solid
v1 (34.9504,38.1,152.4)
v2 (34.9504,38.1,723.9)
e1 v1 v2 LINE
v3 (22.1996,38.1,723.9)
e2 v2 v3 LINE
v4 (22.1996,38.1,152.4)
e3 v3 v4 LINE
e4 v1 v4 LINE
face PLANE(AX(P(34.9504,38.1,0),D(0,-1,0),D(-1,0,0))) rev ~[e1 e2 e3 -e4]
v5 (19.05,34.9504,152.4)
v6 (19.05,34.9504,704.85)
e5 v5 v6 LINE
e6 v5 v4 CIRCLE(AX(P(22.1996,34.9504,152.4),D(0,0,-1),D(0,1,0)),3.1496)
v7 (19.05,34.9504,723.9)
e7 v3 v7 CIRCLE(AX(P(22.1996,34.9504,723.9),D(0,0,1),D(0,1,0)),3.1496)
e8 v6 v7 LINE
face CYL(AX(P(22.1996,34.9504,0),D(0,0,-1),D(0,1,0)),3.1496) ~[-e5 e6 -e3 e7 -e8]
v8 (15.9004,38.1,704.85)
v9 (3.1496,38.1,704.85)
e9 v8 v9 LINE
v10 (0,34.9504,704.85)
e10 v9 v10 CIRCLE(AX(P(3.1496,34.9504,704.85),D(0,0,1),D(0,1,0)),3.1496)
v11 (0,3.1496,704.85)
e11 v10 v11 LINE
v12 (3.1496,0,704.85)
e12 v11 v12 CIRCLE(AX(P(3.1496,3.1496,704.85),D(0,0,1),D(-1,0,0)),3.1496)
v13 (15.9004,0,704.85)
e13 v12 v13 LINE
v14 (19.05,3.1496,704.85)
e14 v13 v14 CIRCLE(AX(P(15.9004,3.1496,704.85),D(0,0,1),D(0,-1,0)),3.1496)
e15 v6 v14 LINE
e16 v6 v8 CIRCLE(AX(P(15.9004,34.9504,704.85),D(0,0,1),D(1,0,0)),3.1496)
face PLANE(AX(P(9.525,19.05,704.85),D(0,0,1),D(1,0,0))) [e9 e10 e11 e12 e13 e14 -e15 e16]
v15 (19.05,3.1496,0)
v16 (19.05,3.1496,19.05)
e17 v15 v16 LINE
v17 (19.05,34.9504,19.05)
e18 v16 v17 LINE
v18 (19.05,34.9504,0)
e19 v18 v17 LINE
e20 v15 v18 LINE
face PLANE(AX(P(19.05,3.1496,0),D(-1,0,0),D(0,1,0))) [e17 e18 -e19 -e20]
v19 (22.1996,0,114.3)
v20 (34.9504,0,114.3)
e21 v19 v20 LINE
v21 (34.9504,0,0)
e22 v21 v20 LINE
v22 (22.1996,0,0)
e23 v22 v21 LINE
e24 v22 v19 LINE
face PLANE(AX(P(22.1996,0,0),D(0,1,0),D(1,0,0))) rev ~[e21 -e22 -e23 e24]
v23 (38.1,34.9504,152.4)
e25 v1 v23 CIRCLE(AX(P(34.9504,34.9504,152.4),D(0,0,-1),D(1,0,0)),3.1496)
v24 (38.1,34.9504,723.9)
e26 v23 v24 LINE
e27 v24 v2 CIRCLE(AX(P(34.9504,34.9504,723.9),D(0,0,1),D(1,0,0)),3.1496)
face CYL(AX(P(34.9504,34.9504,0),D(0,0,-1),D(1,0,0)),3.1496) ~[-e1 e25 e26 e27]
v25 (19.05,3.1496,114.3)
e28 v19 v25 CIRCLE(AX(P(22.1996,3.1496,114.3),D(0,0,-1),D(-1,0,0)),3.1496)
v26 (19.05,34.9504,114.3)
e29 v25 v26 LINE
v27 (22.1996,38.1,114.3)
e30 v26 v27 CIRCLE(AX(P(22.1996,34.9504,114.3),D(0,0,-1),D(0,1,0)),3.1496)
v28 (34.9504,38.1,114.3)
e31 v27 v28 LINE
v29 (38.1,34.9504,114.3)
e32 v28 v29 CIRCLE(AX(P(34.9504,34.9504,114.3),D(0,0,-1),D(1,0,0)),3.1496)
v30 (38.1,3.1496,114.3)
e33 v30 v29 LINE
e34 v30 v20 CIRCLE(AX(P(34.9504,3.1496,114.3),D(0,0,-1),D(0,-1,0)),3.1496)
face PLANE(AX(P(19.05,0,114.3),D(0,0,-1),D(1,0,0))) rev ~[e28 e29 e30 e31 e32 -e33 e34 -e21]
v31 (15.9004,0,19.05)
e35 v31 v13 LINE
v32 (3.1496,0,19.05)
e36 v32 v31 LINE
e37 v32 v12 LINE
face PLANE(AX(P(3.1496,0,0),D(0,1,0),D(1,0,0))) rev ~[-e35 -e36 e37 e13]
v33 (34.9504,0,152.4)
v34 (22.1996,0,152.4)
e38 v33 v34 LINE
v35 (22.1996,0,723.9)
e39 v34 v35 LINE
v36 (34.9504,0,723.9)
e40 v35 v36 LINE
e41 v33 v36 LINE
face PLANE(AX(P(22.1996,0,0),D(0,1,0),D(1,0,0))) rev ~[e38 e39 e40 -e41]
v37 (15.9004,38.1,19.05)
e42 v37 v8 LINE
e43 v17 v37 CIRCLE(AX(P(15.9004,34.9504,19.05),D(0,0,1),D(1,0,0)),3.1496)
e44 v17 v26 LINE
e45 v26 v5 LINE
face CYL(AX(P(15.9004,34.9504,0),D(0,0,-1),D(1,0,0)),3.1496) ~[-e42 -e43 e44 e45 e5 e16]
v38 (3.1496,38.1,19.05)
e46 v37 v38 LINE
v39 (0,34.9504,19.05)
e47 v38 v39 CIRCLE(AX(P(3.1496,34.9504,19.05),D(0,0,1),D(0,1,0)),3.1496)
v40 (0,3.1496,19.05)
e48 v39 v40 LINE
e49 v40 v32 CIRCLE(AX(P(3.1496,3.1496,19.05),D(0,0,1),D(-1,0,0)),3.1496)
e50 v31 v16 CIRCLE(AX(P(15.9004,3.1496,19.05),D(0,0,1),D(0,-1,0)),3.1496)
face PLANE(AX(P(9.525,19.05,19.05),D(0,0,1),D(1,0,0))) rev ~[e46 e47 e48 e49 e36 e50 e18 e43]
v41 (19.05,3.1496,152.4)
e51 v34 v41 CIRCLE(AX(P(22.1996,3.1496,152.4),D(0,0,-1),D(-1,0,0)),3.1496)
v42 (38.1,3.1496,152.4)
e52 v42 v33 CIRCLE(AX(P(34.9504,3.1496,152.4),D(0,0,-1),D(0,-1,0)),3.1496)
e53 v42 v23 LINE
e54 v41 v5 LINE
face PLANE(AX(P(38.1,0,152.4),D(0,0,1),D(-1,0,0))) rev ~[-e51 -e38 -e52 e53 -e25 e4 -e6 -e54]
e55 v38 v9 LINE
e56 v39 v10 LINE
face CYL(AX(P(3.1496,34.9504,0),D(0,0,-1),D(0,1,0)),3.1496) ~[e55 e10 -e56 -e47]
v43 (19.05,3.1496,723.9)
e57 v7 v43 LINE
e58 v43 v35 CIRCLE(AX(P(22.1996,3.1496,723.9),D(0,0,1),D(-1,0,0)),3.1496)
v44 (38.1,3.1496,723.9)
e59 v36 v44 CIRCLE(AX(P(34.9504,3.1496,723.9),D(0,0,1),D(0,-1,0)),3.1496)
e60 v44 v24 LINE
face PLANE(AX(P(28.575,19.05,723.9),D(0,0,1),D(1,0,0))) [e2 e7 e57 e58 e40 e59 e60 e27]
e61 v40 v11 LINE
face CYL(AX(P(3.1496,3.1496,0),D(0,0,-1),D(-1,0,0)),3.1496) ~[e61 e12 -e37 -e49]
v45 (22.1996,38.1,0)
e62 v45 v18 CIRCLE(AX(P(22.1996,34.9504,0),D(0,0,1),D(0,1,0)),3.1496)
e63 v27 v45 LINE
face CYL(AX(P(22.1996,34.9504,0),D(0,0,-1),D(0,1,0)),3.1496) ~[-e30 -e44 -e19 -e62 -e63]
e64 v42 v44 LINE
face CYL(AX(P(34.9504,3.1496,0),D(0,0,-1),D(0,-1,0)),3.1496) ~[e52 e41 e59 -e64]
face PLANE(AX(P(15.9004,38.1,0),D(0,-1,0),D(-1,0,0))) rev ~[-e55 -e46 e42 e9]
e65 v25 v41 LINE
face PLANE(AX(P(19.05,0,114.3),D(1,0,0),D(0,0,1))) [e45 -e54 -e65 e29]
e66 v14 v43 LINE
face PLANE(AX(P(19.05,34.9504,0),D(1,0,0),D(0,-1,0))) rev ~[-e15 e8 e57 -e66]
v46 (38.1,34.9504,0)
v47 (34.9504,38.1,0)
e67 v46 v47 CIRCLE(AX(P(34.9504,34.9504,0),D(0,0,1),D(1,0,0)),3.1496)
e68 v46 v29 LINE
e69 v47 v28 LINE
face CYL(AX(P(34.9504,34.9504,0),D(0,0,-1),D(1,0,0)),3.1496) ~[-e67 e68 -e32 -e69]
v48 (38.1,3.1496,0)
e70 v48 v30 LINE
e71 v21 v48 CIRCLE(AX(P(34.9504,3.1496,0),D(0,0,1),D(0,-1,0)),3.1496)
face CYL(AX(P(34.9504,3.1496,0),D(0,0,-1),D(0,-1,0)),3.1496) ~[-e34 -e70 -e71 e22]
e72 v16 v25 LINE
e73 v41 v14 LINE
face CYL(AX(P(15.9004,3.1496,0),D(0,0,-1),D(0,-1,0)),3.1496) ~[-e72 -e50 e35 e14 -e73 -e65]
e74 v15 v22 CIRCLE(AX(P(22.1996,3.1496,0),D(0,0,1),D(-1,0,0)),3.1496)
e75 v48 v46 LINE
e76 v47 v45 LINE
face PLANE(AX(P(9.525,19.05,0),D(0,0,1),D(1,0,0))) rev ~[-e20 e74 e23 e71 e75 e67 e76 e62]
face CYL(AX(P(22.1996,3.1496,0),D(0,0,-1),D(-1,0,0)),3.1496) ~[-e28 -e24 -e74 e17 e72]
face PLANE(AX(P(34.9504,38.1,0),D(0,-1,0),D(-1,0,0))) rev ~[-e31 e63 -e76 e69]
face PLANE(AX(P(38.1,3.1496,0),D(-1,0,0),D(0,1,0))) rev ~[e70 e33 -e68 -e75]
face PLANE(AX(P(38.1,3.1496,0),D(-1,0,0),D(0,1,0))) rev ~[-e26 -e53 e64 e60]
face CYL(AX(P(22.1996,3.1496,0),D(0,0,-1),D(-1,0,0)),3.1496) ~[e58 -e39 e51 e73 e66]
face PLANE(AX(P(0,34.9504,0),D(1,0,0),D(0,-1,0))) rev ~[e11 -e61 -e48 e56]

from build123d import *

# Parameters (mm, degrees)
F1_DEPTH = 723.9
F2_DEPTH = 704.85
F3_DEPTH = 19.05
F4_W     = 3.1496
F4_H     = 38.1
F4_W_2   = 12.7508
F5_DEPTH = 38.101


# Not quite as in the source:
# - a feature names something its author has since deleted; it is built from what else it names


with BuildPart() as f1:
    # F0 (on Top) → F1 (new body)
    with BuildSketch(Plane.XY):
        with BuildLine():
            Line((19.05, 34.9504), (19.05, 3.1496))
            ThreePointArc((19.05, 3.1496), (19.972496482, 0.922496482), (22.1996, 0))
            Line((22.1996, 0), (34.9504, 0))
            ThreePointArc((34.9504, 0), (37.177503518, 0.922496482), (38.1, 3.1496))
            Line((38.1, 3.1496), (38.1, 34.9504))
            ThreePointArc((38.1, 34.9504), (37.177503518, 37.177503518), (34.9504, 38.1))
            Line((34.9504, 38.1), (22.1996, 38.1))
            ThreePointArc((22.1996, 38.1), (19.972496482, 37.177503518), (19.05, 34.9504))
        make_face()
    extrude(amount=F1_DEPTH)

    # F0 (on Top) → F2 (join)
    with BuildSketch(Plane.XY):
        with BuildLine():
            ThreePointArc((0, 3.1496), (0.922496482, 0.922496482), (3.1496, 0))
            Line((3.1496, 0), (15.9004, 0))
            ThreePointArc((15.9004, 0), (18.127503518, 0.922496482), (19.05, 3.1496))
            Line((19.05, 3.1496), (19.05, 34.9504))
            ThreePointArc((19.05, 34.9504), (18.127503518, 37.177503518), (15.9004, 38.1))
            Line((15.9004, 38.1), (3.1496, 38.1))
            ThreePointArc((3.1496, 38.1), (0.922496482, 37.177503518), (0, 34.9504))
            Line((0, 34.9504), (0, 3.1496))
        make_face()
        with BuildLine():
            Line((19.05, 34.9504), (19.05, 3.1496))
            ThreePointArc((19.05, 3.1496), (19.972496482, 0.922496482), (22.1996, 0))
            Line((22.1996, 0), (34.9504, 0))
            ThreePointArc((34.9504, 0), (37.177503518, 0.922496482), (38.1, 3.1496))
            Line((38.1, 3.1496), (38.1, 34.9504))
            ThreePointArc((38.1, 34.9504), (37.177503518, 37.177503518), (34.9504, 38.1))
            Line((34.9504, 38.1), (22.1996, 38.1))
            ThreePointArc((22.1996, 38.1), (19.972496482, 37.177503518), (19.05, 34.9504))
        make_face()
    extrude(amount=F2_DEPTH)

    # F0 (on Top) → F3 (cut)
    with BuildSketch(Plane.XY):
        with BuildLine():
            ThreePointArc((0, 3.1496), (0.922496482, 0.922496482), (3.1496, 0))
            Line((3.1496, 0), (15.9004, 0))
            ThreePointArc((15.9004, 0), (18.127503518, 0.922496482), (19.05, 3.1496))
            Line((19.05, 3.1496), (19.05, 34.9504))
            ThreePointArc((19.05, 34.9504), (18.127503518, 37.177503518), (15.9004, 38.1))
            Line((15.9004, 38.1), (3.1496, 38.1))
            ThreePointArc((3.1496, 38.1), (0.922496482, 37.177503518), (0, 34.9504))
            Line((0, 34.9504), (0, 3.1496))
        make_face()
    extrude(amount=F3_DEPTH, mode=Mode.SUBTRACT)

    # F4 (on face) → F5 (cut, through all)
    with BuildSketch(Plane.XZ):
        with Locations((36.5252, 133.35)):
            Rectangle(F4_W, F4_H)
        with Locations((28.575, 133.35)):
            Rectangle(F4_W_2, F4_H)
        with Locations((20.6248, 133.35)):
            Rectangle(F4_W, F4_H)
    extrude(amount=-F5_DEPTH, mode=Mode.SUBTRACT)


solid = f1.part
